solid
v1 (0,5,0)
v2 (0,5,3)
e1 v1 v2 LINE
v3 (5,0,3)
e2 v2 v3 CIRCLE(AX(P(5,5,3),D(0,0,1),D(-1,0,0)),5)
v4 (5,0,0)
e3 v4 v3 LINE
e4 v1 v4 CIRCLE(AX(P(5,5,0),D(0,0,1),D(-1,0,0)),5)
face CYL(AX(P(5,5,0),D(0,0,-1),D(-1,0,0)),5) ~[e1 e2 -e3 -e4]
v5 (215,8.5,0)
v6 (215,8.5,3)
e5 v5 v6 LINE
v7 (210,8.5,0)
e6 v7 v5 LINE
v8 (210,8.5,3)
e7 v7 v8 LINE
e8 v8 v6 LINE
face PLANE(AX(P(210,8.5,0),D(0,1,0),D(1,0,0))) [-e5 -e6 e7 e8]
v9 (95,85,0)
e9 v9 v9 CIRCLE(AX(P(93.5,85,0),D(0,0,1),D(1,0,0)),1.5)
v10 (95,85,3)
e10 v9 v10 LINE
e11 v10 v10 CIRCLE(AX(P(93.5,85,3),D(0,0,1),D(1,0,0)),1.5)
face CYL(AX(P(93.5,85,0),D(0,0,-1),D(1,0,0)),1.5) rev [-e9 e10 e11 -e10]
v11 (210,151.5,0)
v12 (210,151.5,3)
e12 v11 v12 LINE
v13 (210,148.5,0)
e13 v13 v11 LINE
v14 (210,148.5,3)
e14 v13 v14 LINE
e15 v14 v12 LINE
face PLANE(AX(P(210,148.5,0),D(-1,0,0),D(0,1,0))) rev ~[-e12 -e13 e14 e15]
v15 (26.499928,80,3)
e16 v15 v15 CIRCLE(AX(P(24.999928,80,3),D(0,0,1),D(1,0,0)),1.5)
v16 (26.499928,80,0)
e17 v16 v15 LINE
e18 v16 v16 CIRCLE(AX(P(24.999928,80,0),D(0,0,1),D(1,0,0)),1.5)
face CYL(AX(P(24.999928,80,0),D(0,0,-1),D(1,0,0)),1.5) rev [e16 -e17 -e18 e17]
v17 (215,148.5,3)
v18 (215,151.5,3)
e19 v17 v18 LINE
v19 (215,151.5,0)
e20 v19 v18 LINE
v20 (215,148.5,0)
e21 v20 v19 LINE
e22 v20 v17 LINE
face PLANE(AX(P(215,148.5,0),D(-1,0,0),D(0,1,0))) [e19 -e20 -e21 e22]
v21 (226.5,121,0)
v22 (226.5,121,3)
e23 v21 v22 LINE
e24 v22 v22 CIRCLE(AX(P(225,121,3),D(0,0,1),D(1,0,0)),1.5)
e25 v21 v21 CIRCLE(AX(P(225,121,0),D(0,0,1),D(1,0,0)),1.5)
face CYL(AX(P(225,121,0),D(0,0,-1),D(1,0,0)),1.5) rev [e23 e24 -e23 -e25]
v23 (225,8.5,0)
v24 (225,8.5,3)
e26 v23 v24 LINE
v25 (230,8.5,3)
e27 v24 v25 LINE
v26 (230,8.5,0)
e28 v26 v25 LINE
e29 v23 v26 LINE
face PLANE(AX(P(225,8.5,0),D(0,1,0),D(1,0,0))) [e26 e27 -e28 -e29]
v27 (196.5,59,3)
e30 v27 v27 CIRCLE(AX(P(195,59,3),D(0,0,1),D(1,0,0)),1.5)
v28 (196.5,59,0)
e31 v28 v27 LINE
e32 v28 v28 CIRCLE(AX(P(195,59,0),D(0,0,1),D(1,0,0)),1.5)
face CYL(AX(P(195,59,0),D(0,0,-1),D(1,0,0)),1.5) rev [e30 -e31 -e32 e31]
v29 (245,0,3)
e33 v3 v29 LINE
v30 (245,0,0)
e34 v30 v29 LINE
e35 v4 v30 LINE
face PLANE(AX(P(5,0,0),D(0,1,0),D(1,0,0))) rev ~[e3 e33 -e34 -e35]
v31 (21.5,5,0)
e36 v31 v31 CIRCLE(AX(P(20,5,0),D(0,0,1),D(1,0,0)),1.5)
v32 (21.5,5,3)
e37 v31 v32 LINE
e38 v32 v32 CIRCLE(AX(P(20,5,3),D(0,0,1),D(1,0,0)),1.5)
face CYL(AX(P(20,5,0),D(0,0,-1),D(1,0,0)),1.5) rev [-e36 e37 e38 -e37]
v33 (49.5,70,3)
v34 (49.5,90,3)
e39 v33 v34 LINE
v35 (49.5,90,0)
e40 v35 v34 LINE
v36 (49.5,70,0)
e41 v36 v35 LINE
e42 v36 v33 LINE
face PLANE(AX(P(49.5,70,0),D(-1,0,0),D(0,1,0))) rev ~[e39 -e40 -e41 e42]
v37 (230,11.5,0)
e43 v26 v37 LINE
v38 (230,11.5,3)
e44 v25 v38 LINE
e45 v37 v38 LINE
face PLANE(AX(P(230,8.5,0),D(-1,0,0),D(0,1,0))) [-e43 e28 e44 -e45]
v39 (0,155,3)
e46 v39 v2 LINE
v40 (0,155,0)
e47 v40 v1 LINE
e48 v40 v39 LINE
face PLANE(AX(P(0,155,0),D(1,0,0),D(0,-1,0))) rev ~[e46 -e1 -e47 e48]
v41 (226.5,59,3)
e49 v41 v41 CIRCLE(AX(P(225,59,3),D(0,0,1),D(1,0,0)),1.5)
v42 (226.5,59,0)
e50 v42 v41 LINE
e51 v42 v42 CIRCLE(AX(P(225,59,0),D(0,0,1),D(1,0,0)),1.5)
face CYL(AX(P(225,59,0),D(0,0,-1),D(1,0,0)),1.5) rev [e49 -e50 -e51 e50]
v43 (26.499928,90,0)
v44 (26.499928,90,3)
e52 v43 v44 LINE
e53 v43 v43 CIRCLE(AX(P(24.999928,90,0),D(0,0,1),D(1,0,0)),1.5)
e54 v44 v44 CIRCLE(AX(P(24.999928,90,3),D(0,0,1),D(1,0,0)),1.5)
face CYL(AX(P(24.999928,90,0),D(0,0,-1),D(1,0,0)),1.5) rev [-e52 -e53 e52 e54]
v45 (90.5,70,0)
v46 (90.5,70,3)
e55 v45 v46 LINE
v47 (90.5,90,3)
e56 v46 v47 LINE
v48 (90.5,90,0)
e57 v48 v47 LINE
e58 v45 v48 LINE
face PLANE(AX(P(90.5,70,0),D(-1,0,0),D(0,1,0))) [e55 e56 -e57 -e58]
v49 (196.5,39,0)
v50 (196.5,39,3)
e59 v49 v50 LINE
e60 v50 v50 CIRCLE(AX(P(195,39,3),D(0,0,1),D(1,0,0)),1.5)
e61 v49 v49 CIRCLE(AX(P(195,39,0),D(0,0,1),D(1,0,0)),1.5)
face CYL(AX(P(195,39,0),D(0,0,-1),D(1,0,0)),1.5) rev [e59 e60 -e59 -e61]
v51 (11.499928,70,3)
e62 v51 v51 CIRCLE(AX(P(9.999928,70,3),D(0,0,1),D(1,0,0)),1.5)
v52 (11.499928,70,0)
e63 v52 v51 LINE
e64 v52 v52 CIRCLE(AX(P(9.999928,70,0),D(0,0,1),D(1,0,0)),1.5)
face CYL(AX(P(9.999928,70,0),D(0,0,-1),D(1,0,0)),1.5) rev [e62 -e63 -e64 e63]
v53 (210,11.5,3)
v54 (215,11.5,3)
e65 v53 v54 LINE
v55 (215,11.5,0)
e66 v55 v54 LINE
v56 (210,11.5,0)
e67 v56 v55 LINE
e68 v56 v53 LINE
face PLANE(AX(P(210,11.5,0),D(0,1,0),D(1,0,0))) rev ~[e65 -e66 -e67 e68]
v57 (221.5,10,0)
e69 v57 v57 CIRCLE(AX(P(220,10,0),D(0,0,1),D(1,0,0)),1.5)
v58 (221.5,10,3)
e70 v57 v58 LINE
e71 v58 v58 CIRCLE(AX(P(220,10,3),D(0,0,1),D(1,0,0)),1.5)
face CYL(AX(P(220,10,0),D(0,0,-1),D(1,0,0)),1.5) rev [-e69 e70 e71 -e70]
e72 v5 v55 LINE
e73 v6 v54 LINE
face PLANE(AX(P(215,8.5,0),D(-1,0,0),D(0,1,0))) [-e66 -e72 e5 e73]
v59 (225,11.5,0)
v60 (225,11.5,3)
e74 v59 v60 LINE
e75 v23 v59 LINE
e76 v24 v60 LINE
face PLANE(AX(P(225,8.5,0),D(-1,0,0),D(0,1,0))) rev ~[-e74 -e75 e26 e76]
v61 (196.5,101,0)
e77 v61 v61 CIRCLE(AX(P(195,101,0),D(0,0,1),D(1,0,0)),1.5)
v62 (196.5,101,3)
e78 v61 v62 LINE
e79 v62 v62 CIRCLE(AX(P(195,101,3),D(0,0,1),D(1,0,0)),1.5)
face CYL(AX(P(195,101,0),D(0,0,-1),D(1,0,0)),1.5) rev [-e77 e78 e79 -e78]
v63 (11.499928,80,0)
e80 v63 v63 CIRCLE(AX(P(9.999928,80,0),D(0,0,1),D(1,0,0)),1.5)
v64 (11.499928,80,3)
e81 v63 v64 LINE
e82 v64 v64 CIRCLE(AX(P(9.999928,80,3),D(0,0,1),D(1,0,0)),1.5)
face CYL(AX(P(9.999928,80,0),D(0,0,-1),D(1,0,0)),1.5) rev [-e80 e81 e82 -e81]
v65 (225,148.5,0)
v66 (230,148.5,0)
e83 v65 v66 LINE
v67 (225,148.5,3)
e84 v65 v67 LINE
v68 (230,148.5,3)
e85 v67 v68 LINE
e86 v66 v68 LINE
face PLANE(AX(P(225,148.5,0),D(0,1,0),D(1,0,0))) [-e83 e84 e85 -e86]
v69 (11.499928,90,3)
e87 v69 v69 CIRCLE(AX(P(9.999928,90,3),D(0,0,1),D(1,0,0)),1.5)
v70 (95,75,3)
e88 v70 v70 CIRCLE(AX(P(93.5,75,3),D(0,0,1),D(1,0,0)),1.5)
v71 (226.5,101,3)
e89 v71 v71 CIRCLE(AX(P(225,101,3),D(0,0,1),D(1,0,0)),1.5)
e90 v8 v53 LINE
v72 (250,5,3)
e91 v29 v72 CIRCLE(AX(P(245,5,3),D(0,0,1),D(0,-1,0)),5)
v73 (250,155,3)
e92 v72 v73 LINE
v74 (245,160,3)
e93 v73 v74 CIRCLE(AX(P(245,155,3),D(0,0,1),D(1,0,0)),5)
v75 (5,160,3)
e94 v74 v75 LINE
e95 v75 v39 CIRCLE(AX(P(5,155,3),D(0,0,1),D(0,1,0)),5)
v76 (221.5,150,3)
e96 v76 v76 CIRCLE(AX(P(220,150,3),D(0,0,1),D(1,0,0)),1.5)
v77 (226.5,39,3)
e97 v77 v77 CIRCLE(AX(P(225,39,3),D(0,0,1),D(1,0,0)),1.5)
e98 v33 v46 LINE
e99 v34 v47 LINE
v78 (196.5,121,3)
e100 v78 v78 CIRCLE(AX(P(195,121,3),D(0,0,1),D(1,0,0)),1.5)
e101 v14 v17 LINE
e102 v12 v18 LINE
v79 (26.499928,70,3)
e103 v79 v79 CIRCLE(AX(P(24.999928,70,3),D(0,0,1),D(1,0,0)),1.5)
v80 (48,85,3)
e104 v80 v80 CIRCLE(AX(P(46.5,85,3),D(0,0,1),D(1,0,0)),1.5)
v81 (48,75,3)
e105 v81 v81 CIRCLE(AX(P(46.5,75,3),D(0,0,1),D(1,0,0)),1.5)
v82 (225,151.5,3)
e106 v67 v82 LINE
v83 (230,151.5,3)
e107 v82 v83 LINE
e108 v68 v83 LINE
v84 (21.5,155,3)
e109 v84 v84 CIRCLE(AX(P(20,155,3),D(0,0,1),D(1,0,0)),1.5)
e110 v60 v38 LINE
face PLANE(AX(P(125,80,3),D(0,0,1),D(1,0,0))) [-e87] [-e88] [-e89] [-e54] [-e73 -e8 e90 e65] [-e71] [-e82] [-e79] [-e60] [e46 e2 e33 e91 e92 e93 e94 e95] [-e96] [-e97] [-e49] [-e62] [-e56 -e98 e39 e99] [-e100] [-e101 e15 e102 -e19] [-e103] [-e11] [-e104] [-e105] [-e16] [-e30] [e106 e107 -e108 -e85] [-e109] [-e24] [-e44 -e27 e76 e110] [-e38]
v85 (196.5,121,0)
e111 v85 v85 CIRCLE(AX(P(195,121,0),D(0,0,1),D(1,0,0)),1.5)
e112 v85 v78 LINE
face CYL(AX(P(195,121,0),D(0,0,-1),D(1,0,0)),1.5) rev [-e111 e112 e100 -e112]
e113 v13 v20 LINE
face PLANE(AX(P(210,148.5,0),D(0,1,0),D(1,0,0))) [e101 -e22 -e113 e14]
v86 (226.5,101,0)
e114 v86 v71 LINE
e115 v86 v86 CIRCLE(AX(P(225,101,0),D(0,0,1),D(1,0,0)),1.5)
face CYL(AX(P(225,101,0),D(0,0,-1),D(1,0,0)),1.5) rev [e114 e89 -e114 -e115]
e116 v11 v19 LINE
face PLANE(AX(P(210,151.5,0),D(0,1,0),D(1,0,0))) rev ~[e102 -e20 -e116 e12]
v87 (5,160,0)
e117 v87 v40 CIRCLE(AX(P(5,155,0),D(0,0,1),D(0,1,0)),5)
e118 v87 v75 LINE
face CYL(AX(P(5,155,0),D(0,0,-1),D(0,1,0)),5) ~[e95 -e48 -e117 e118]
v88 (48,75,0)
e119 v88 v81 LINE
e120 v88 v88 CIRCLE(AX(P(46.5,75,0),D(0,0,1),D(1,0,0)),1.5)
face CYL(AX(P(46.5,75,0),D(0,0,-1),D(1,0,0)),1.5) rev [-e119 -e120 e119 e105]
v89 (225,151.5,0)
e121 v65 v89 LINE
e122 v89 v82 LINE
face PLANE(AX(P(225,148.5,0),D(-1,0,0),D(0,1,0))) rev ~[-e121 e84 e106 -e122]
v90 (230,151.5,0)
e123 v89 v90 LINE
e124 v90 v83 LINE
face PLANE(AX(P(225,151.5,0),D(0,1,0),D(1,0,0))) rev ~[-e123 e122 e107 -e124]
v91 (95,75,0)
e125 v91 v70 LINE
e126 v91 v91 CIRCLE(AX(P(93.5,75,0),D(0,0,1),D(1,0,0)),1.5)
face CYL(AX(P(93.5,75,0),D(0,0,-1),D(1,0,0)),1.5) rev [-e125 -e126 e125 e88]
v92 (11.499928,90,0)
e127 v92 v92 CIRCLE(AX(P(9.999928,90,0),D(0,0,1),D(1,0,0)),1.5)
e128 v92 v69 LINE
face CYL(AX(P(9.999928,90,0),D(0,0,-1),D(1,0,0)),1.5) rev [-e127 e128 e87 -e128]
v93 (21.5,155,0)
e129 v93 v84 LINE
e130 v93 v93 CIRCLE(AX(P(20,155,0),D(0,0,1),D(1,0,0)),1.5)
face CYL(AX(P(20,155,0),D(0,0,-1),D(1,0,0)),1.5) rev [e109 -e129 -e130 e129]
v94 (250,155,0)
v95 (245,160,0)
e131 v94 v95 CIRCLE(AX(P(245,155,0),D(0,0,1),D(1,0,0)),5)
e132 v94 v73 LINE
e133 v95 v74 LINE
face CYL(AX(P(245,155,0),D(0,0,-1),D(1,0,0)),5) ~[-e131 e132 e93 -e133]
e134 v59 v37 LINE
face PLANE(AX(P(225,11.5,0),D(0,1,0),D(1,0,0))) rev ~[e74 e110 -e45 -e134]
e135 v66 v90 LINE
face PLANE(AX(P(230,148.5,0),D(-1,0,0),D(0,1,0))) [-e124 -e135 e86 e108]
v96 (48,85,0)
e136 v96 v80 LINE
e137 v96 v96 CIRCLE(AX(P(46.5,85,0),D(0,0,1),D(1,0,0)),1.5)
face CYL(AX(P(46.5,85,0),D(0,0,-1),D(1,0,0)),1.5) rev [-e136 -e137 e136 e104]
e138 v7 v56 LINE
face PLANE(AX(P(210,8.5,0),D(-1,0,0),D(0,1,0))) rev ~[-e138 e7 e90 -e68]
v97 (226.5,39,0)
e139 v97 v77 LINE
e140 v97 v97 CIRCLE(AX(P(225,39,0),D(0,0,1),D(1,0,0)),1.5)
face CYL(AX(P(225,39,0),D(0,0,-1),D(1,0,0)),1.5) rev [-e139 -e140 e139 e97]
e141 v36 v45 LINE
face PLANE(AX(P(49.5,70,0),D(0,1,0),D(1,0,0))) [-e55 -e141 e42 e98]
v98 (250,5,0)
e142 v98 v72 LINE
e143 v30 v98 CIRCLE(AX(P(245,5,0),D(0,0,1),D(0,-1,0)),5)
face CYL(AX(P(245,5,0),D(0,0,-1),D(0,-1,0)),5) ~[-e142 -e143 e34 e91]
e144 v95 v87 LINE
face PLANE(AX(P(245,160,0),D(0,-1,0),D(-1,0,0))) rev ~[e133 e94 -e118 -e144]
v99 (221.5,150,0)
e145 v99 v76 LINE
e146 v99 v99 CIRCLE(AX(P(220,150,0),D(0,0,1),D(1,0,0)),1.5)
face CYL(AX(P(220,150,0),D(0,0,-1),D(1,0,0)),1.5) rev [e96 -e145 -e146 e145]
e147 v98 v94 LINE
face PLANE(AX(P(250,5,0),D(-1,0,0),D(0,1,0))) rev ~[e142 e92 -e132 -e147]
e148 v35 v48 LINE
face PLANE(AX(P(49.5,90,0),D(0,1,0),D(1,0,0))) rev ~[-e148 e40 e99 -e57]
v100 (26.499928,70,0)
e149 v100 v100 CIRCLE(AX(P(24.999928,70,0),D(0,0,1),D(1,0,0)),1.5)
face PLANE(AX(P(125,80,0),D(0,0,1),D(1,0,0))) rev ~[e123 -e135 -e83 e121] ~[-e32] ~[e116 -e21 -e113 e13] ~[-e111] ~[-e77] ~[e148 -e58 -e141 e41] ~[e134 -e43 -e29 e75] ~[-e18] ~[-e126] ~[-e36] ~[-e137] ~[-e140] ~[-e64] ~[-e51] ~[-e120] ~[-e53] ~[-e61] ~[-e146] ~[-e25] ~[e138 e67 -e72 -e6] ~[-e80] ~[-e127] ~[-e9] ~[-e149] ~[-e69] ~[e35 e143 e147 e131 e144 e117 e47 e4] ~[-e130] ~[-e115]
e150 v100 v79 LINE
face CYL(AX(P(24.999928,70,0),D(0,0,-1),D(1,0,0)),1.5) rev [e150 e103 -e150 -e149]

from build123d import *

# Parameters (mm, degrees)
F0_R     = 1.5
F0_W     = 5
F0_H     = 3
F0_W_2   = 41
F0_H_2   = 20
F1_DEPTH = 3


with BuildPart() as f1:
    # F0 (on Top) → F1 (new body)
    with BuildSketch(Plane.XY):
        with BuildLine():
            Line((245, 160), (5, 160))
            ThreePointArc((5, 160), (1.4644660941, 158.5355339059), (0, 155))
            Line((0, 155), (0, 5))
            ThreePointArc((0, 5), (1.4644660941, 1.4644660941), (5, 0))
            Line((5, 0), (245, 0))
            ThreePointArc((245, 0), (248.5355339059, 1.4644660941), (250, 5))
            Line((250, 5), (250, 155))
            ThreePointArc((250, 155), (248.5355339059, 158.5355339059), (245, 160))
        make_face()
        with Locations((20, 5)):
            Circle(F0_R, mode=Mode.SUBTRACT)
        with Locations((212.5, 10)):
            Rectangle(F0_W, F0_H, mode=Mode.SUBTRACT)
        with Locations((220, 10)):
            Circle(F0_R, mode=Mode.SUBTRACT)
        with Locations((227.5, 10)):
            Rectangle(F0_W, F0_H, mode=Mode.SUBTRACT)
        with Locations((195, 39)):
            Circle(F0_R, mode=Mode.SUBTRACT)
        with Locations((225, 39)):
            Circle(F0_R, mode=Mode.SUBTRACT)
        with Locations((9.9999278665, 70)):
            Circle(F0_R, mode=Mode.SUBTRACT)
        with Locations((24.9999278665, 70)):
            Circle(F0_R, mode=Mode.SUBTRACT)
        with Locations((9.9999278665, 80)):
            Circle(F0_R, mode=Mode.SUBTRACT)
        with Locations((24.9999278665, 80)):
            Circle(F0_R, mode=Mode.SUBTRACT)
        with Locations((9.9999278665, 90)):
            Circle(F0_R, mode=Mode.SUBTRACT)
        with Locations((24.9999278665, 90)):
            Circle(F0_R, mode=Mode.SUBTRACT)
        with Locations((46.5, 75)):
            Circle(F0_R, mode=Mode.SUBTRACT)
        with Locations((46.5, 85)):
            Circle(F0_R, mode=Mode.SUBTRACT)
        with Locations((70, 80)):
            Rectangle(F0_W_2, F0_H_2, mode=Mode.SUBTRACT)
        with Locations((93.5, 75)):
            Circle(F0_R, mode=Mode.SUBTRACT)
        with Locations((93.5, 85)):
            Circle(F0_R, mode=Mode.SUBTRACT)
        with Locations((20, 155)):
            Circle(F0_R, mode=Mode.SUBTRACT)
        with Locations((195, 59)):
            Circle(F0_R, mode=Mode.SUBTRACT)
        with Locations((225, 59)):
            Circle(F0_R, mode=Mode.SUBTRACT)
        with Locations((195, 101)):
            Circle(F0_R, mode=Mode.SUBTRACT)
        with Locations((195, 121)):
            Circle(F0_R, mode=Mode.SUBTRACT)
        with Locations((225, 101)):
            Circle(F0_R, mode=Mode.SUBTRACT)
        with Locations((225, 121)):
            Circle(F0_R, mode=Mode.SUBTRACT)
        with Locations((212.5, 150)):
            Rectangle(F0_W, F0_H, mode=Mode.SUBTRACT)
        with Locations((220, 150)):
            Circle(F0_R, mode=Mode.SUBTRACT)
        with Locations((227.5, 150)):
            Rectangle(F0_W, F0_H, mode=Mode.SUBTRACT)
    extrude(amount=F1_DEPTH)


solid = f1.part
